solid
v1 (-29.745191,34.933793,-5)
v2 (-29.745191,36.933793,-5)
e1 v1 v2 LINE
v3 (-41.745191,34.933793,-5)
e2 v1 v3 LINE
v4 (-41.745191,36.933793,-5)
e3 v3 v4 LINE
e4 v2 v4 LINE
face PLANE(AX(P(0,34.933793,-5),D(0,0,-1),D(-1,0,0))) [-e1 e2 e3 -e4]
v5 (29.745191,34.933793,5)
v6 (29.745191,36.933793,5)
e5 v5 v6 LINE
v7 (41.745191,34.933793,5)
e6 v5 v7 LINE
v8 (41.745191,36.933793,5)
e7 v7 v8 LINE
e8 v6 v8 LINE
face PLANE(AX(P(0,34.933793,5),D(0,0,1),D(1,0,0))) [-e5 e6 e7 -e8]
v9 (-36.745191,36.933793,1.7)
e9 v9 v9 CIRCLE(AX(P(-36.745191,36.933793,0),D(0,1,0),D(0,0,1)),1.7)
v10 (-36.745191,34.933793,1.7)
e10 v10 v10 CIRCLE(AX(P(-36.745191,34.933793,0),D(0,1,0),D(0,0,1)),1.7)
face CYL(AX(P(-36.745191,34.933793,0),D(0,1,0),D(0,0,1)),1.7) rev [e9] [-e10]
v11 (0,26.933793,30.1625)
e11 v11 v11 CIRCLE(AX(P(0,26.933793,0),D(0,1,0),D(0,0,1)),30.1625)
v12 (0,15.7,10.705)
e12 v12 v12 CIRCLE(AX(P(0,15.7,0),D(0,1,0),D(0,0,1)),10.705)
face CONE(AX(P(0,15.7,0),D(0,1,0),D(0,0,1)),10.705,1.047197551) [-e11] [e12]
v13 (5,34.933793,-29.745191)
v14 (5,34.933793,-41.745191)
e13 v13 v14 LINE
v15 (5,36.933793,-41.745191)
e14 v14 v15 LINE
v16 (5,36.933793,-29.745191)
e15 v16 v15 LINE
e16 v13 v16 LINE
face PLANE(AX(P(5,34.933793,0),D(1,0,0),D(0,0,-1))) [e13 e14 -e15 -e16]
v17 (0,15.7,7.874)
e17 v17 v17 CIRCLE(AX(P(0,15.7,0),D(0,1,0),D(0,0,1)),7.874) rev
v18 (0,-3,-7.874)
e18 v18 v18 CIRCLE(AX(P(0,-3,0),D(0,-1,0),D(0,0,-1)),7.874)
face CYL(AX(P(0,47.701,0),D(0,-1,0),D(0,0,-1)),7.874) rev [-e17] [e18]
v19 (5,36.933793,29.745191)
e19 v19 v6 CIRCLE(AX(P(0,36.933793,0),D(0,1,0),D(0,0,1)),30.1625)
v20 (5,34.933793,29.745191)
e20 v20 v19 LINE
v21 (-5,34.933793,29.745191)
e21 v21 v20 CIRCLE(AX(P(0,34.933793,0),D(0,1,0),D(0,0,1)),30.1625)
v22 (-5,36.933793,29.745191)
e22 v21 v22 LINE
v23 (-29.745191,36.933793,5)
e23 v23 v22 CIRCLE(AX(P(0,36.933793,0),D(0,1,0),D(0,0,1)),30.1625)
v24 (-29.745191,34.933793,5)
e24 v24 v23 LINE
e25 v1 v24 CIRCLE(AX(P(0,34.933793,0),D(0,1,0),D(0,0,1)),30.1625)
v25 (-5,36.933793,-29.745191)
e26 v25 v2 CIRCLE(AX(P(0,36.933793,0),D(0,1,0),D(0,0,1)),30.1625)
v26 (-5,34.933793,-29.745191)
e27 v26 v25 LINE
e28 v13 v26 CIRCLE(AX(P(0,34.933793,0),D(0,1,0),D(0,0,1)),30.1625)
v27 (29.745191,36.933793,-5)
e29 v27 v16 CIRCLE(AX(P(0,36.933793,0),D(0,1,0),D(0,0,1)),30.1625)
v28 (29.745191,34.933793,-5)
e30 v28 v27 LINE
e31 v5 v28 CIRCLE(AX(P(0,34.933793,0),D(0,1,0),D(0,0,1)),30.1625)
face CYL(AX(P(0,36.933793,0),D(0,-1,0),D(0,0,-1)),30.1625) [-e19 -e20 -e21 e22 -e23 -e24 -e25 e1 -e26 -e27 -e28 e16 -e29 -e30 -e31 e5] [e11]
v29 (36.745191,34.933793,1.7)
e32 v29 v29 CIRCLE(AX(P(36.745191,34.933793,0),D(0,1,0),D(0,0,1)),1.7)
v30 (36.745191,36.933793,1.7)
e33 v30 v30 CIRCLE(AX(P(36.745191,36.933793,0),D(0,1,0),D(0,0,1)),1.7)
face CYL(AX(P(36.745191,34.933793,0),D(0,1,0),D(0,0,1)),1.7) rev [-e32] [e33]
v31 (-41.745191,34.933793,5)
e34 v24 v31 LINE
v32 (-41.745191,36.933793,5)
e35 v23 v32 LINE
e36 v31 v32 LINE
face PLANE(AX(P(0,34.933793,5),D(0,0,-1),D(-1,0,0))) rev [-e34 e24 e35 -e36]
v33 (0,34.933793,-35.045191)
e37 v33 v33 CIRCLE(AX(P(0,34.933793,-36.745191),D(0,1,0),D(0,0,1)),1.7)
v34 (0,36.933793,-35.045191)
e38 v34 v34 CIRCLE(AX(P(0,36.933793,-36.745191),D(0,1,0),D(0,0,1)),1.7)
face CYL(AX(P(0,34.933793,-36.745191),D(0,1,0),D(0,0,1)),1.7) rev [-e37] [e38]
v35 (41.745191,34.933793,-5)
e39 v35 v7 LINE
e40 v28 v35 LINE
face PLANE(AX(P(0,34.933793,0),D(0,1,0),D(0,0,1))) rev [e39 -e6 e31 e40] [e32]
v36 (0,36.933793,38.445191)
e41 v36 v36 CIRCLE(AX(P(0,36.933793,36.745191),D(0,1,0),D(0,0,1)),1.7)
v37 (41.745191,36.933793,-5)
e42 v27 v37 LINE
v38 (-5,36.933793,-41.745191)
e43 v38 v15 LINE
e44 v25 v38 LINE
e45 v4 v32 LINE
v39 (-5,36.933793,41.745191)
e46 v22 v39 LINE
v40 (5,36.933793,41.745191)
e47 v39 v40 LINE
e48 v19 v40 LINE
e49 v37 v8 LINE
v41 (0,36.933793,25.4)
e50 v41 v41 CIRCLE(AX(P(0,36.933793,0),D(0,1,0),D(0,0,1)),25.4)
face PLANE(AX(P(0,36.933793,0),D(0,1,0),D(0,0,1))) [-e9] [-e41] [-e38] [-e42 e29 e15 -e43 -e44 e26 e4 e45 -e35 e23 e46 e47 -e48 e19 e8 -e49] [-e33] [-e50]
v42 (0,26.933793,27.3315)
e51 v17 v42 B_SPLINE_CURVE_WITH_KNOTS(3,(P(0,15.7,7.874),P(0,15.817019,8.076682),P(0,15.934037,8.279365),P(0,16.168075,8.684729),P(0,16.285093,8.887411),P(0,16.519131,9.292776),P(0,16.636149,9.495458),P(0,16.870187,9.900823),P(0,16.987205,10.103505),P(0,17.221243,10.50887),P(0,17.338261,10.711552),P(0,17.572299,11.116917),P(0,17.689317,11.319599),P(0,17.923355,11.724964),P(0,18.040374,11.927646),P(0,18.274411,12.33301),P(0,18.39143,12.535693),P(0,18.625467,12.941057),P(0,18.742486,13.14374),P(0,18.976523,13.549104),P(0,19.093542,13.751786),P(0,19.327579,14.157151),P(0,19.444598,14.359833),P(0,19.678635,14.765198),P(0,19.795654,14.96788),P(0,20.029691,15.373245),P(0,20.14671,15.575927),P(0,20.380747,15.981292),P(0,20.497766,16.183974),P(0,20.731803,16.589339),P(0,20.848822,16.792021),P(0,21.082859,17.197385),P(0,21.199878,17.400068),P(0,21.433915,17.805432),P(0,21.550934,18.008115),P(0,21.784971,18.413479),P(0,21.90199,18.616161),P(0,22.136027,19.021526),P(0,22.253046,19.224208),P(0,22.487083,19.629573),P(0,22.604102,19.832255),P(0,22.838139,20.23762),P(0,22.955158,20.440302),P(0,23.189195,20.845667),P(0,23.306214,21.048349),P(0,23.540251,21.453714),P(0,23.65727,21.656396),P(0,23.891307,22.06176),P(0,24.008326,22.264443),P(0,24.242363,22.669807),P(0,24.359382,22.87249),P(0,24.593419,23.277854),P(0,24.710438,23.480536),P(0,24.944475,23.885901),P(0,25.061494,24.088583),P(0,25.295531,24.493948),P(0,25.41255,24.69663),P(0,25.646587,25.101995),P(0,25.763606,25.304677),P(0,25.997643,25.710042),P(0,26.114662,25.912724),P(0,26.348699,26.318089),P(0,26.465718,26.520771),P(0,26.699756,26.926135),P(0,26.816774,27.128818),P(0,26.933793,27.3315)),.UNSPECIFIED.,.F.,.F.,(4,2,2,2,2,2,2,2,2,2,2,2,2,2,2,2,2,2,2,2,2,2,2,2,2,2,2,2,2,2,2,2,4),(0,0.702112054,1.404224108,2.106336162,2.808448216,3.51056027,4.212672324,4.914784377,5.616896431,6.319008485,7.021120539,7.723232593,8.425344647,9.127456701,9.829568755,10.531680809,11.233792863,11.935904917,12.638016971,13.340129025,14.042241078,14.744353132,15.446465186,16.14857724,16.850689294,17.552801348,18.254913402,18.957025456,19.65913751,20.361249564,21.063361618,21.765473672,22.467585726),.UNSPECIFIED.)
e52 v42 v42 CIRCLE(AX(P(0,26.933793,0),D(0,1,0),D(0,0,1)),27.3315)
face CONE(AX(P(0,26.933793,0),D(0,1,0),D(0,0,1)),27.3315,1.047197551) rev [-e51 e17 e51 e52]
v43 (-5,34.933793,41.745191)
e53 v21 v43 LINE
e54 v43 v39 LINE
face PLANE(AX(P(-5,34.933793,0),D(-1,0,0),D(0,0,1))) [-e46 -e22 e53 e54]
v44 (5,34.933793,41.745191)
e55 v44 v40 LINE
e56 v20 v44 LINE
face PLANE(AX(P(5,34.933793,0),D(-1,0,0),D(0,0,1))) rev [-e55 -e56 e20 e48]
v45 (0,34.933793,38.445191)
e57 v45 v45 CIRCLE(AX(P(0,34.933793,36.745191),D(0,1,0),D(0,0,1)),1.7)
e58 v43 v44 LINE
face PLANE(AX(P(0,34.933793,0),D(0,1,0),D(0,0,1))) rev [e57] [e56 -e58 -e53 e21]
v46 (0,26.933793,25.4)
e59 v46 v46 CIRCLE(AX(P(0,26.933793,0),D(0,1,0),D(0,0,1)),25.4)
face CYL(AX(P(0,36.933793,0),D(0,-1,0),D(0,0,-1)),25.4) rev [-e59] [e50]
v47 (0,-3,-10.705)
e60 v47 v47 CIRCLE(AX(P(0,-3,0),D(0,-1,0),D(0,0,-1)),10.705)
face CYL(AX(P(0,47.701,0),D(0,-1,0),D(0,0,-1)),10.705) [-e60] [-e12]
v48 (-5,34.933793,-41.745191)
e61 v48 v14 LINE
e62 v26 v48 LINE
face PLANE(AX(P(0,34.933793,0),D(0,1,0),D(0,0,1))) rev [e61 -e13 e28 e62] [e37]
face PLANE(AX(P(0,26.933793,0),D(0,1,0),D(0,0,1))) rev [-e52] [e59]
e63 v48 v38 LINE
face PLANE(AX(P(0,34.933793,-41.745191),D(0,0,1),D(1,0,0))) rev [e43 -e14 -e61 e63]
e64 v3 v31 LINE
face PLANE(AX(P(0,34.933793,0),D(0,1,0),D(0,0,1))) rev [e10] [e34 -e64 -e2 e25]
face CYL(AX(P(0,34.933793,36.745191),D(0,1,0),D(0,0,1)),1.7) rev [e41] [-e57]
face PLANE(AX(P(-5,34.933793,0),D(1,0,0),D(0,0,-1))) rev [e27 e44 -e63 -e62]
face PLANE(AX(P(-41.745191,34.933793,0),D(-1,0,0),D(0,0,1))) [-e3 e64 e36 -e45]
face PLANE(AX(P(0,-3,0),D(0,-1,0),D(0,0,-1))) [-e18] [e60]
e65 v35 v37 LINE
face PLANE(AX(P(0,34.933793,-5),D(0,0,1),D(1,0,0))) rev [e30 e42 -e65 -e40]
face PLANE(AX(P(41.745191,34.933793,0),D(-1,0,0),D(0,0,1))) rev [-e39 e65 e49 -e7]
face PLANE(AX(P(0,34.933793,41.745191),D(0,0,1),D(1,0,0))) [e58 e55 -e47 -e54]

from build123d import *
from build123d.topology import SkipClean

# Parameters (mm, degrees)
SKETCH5_OUTSIDE_W   = 34.468
SKETCH5_OUTSIDE_H   = 34.468
CUT_EXTRUDE1_DEPTH  = 7.2
BOSS_EXTRUDE1_REACH = 51.718
SKETCH10_R          = 10.705
SKETCH10_R_2        = 6.9
SKETCH22_R          = 10.705
SKETCH22_R_2        = 7.874
BOSS_EXTRUDE7_DEPTH = 3
BOSS_EXTRUDE3_REACH = 31.655
SKETCH12_R          = 8.3
CUT_EXTRUDE3_REACH  = 56.551
SKETCH13_R          = 3.45
SKETCH14_R          = 23.979548074
CUT_EXTRUDE5_DEPTH  = 32
SKETCH17_R          = 30.1625
SKETCH17_R_2        = 25.4
BOSS_EXTRUDE5_DEPTH = 10
BOSS_EXTRUDE6_START = -2
SKETCH18_R          = 1.7
BOSS_EXTRUDE6_DEPTH = 2


# Read off the part's stored shape, not the designer's step: Cut-Extrude2
with BuildPart() as part:
    # Sketch1 → Revolve1 (revolve)
    with BuildSketch(Plane.XY, mode=Mode.PRIVATE) as revolve1_sk:
        Polygon((3.25, 47.7), (4.8, 47.7), (5.2, 43.217813034), (4.8, 42.533333333), (5.2, 38.051146367), (4.8, 37.366666667), (5.2, 32.8844797), (4.8, 32.2), (5.25, 26.2), (5.25, 22.2), (10.6, 22.2), (10.6, 15), (8.3, 15), (8.3, 0), (5.5, 0), (5.5, 18), (3.25, 19.7), align=None)
    revolve(revolve1_sk.sketch.rotate(Axis((0, 0, 0), (0, 1, 0)), 90), axis=Axis((0, 0, 0), (0, 1, 0)))

    # Sketch5 outside → Cut-Extrude1 (cut)
    with BuildSketch(Plane(origin=(0, 22.2, 0), x_dir=(1, 0, 0), z_dir=(0, 1, 0))):
        Rectangle(SKETCH5_OUTSIDE_W, SKETCH5_OUTSIDE_H)
        Polygon((-5.3, 9.17986928), (5.3, 9.17986928), (10.6, 0), (5.3, -9.17986928), (-5.3, -9.17986928), (-10.6, 0), align=None, mode=Mode.SUBTRACT)
    extrude(amount=-CUT_EXTRUDE1_DEPTH, mode=Mode.SUBTRACT)

    # Sketch4 → Cut-Revolve1 (revolve, cut)
    with BuildSketch(Plane.XY, mode=Mode.PRIVATE) as cut_revolve1_sk:
        Polygon((6.9, 0), (8.3, 1.4), (8.3, 0), align=None)
        Polygon((8.3, 15), (10.6, 15.837131539), (10.6, 15), align=None)
        Polygon((8.3, 22.2), (10.6, 21.362868461), (10.6, 22.2), align=None)
    revolve(cut_revolve1_sk.sketch.rotate(Axis((0, 0, 0), (0, 1, 0)), 90), axis=Axis((0, 0, 0), (0, 1, 0)), mode=Mode.SUBTRACT)

    # Boss-Extrude1: up to this cone (the profile starts outside it)
    boss_extrude1_end = Plane(origin=(0, 0, 0), z_dir=(0, 1, 0)).offset(11.979048056) * Cone(2.747e-06, 110.555614597, 40.238951944, align=(Align.CENTER, Align.CENTER, Align.MIN), mode=Mode.PRIVATE)
    # Sketch10 → Boss-Extrude1 (add, up to the surface)
    with BuildSketch(Plane.XZ, mode=Mode.PRIVATE) as boss_extrude1_sk1:
        with Locations(Location((0, 0, 0), (0, 0, 270))):
            Circle(SKETCH10_R)
        Circle(SKETCH10_R_2, mode=Mode.SUBTRACT)
    boss_extrude1_tool1 = extrude(boss_extrude1_sk1.sketch, amount=-BOSS_EXTRUDE1_REACH, mode=Mode.PRIVATE) - boss_extrude1_end
    add(boss_extrude1_tool1.solids().sort_by_distance((0, 0, 10.402217))[0])

    # Cut-Extrude2 outline → Cut-Extrude2 (revolve, cut)
    with BuildSketch(Plane.XY):
        Polygon((7.874, 16.206311111), (5.5, 18), (5.5, 0), (7.874, 0), align=None)
    revolve(axis=Axis((0, 0, 0), (0, 1, 0)), mode=Mode.SUBTRACT)

    # Sketch22 → Boss-Extrude7 (add)
    with SkipClean():  # the faces are left unmerged after this step: merging them gives an invalid solid
        with BuildSketch(Plane.XZ):
            with Locations(Location((0, 0, 0), (0, 0, 270))):
                Circle(SKETCH22_R)
            with Locations(Location((0, 0, 0), (0, 0, 270))):
                Circle(SKETCH22_R_2, mode=Mode.SUBTRACT)
        extrude(amount=BOSS_EXTRUDE7_DEPTH)

    # Boss-Extrude3: up to this cone (the profile starts inside it)
    with SkipClean():  # the faces are left unmerged after this step: merging them gives an invalid solid
        boss_extrude3_end = Plane(origin=(0, 22.2, 0), z_dir=(0, 1, 0)).offset(-10.220951944) * Cone(2.747e-06, 193.581188051, 70.457789364, align=(Align.CENTER, Align.CENTER, Align.MIN), mode=Mode.PRIVATE)
        # Sketch12 → Boss-Extrude3 (add, up to the surface)
        with BuildSketch(Plane(origin=(0, 22.2, 0), x_dir=(1, 0, 0), z_dir=(0, 1, 0)), mode=Mode.PRIVATE) as boss_extrude3_sk1:
            Polygon((-7.609401077, 13.17986928), (-15.218802154, 0), (-7.609401077, -13.17986928), (7.609401077, -13.17986928), (15.218802154, 0), (7.609401077, 13.17986928), align=None)
            Circle(SKETCH12_R, mode=Mode.SUBTRACT)
        boss_extrude3_tool1 = extrude(boss_extrude3_sk1.sketch, amount=-BOSS_EXTRUDE3_REACH, mode=Mode.PRIVATE) & boss_extrude3_end
        add(boss_extrude3_tool1.solids().sort_by_distance((-11.065395, 22.2, -6.388609))[0])

    # Cut-Extrude3: up to this cone (the profile starts outside it)
    with SkipClean():  # the faces are left unmerged after this step: merging them gives an invalid solid
        cut_extrude3_end = Plane(origin=(0, 47.7, 0), z_dir=(0, -1, 0)).offset(25.544445444) * Cone(1.324e-06, 41.699852941, 31.506554556, align=(Align.CENTER, Align.CENTER, Align.MIN), mode=Mode.PRIVATE)
        # Sketch13 → Cut-Extrude3 (cut, up to the surface)
        with BuildSketch(Plane(origin=(0, 47.7, 0), x_dir=(1, 0, 0), z_dir=(0, 1, 0)), mode=Mode.PRIVATE) as cut_extrude3_sk1:
            with Locations(Location((0, 0, 0), (0, 0, 270))):
                Circle(SKETCH13_R)
        cut_extrude3_tool1 = extrude(cut_extrude3_sk1.sketch, amount=-CUT_EXTRUDE3_REACH, mode=Mode.PRIVATE) - cut_extrude3_end
        add(cut_extrude3_tool1.solids().sort_by_distance((0, 47.7, 0))[0], mode=Mode.SUBTRACT)

    # Sketch14 → Cut-Extrude5 (cut)
    with SkipClean():  # the faces are left unmerged after this step: merging them gives an invalid solid
        with BuildSketch(Plane(origin=(0, 47.7, 0), x_dir=(1, 0, 0), z_dir=(0, 1, 0))):
            Circle(SKETCH14_R)
        extrude(amount=-CUT_EXTRUDE5_DEPTH, mode=Mode.SUBTRACT)

    # Sketch20 → Revolve2 (revolve)
    with SkipClean():  # the faces are left unmerged after this step: merging them gives an invalid solid
        with BuildSketch(Plane(origin=(0, 0, 0), x_dir=(0, 0, -1), z_dir=(1, 0, 0))):
            Polygon((10.705, 15.7), (30.1625, 26.933792863), (27.3315, 26.933792863), (7.874, 15.7), align=None)
        revolve(axis=Axis((0, 30.70199832, 0), (0, -1, 0)))

    # Sketch17 → Boss-Extrude5 (add)
    with SkipClean():  # the faces are left unmerged after this step: merging them gives an invalid solid
        with BuildSketch(Plane(origin=(0, 26.933792863, 0), x_dir=(1, 0, 0), z_dir=(0, 1, 0))):
            with Locations(Location((0, 0, 0), (0, 0, 270))):
                Circle(SKETCH17_R)
            with Locations(Location((0, 0, 0), (0, 0, 270))):
                Circle(SKETCH17_R_2, mode=Mode.SUBTRACT)
        extrude(amount=BOSS_EXTRUDE5_DEPTH)

    # Sketch18 → Boss-Extrude6 (add)
    # profile 1 of 8: a face of its own
    with SkipClean():  # the faces are left unmerged after this step: merging them gives an invalid solid
        with BuildSketch(Plane(origin=(0, 36.933792863, 0), x_dir=(1, 0, 0), z_dir=(0, 1, 0)).offset(BOSS_EXTRUDE6_START)):
            with BuildLine():
                ThreePointArc((-29.745191313, -5), (-30.1625, 0), (-29.745191313, 5))
                Line((-29.745191313, 5), (-41.745191313, 5))
                Line((-41.745191313, 5), (-41.745191313, -5))
                Line((-41.745191313, -5), (-29.745191313, -5))
            make_face()
            with Locations(Location((-36.745191313, 0, 0), (0, 0, 270))):
                Circle(SKETCH18_R, mode=Mode.SUBTRACT)
        # profile 2 of 8: a face of its own
        with BuildSketch(Plane(origin=(0, 36.933792863, 0), x_dir=(1, 0, 0), z_dir=(0, 1, 0)).offset(BOSS_EXTRUDE6_START)):
            with BuildLine():
                Line((-29.745191313, -5), (-29.745191313, 5))
                ThreePointArc((-29.745191313, 5), (-30.1625, 0), (-29.745191313, -5))
            make_face()
        # profile 3 of 8: a face of its own
        with BuildSketch(Plane(origin=(0, 36.933792863, 0), x_dir=(1, 0, 0), z_dir=(0, 1, 0)).offset(BOSS_EXTRUDE6_START)):
            with BuildLine():
                ThreePointArc((29.745191313, -5), (30.1625, 0), (29.745191313, 5))
                Line((29.745191313, 5), (29.745191313, -5))
            make_face()
        # profile 4 of 8: a face of its own
        with BuildSketch(Plane(origin=(0, 36.933792863, 0), x_dir=(1, 0, 0), z_dir=(0, 1, 0)).offset(BOSS_EXTRUDE6_START)):
            with BuildLine():
                Line((41.745191313, 5), (29.745191313, 5))
                ThreePointArc((29.745191313, 5), (30.1625, 0), (29.745191313, -5))
                Line((29.745191313, -5), (41.745191313, -5))
                Line((41.745191313, -5), (41.745191313, 5))
            make_face()
            with Locations(Location((36.745191313, 0, 0), (0, 0, 270))):
                Circle(SKETCH18_R, mode=Mode.SUBTRACT)
        # profile 5 of 8: a face of its own
        with BuildSketch(Plane(origin=(0, 36.933792863, 0), x_dir=(1, 0, 0), z_dir=(0, 1, 0)).offset(BOSS_EXTRUDE6_START)):
            with BuildLine():
                ThreePointArc((5, -29.745191313), (0, -30.1625), (-5, -29.745191313))
                Line((-5, -29.745191313), (-5, -41.745191313))
                Line((-5, -41.745191313), (5, -41.745191313))
                Line((5, -41.745191313), (5, -29.745191313))
            make_face()
            with Locations(Location((0, -36.745191313, 0), (0, 0, 270))):
                Circle(SKETCH18_R, mode=Mode.SUBTRACT)
        # profile 6 of 8: a face of its own
        with BuildSketch(Plane(origin=(0, 36.933792863, 0), x_dir=(1, 0, 0), z_dir=(0, 1, 0)).offset(BOSS_EXTRUDE6_START)):
            with BuildLine():
                Line((5, -29.745191313), (-5, -29.745191313))
                ThreePointArc((-5, -29.745191313), (0, -30.1625), (5, -29.745191313))
            make_face()
        # profile 7 of 8: a face of its own
        with BuildSketch(Plane(origin=(0, 36.933792863, 0), x_dir=(1, 0, 0), z_dir=(0, 1, 0)).offset(BOSS_EXTRUDE6_START)):
            with BuildLine():
                ThreePointArc((5, 29.745191313), (0, 30.1625), (-5, 29.745191313))
                Line((-5, 29.745191313), (5, 29.745191313))
            make_face()
        # profile 8 of 8: a face of its own
        with BuildSketch(Plane(origin=(0, 36.933792863, 0), x_dir=(1, 0, 0), z_dir=(0, 1, 0)).offset(BOSS_EXTRUDE6_START)):
            with BuildLine():
                Line((-5, 41.745191313), (-5, 29.745191313))
                ThreePointArc((-5, 29.745191313), (0, 30.1625), (5, 29.745191313))
                Line((5, 29.745191313), (5, 41.745191313))
                Line((5, 41.745191313), (-5, 41.745191313))
            make_face()
            with Locations(Location((0, 36.745191313, 0), (0, 0, 270))):
                Circle(SKETCH18_R, mode=Mode.SUBTRACT)
        extrude(amount=BOSS_EXTRUDE6_DEPTH)


solid = part.part
